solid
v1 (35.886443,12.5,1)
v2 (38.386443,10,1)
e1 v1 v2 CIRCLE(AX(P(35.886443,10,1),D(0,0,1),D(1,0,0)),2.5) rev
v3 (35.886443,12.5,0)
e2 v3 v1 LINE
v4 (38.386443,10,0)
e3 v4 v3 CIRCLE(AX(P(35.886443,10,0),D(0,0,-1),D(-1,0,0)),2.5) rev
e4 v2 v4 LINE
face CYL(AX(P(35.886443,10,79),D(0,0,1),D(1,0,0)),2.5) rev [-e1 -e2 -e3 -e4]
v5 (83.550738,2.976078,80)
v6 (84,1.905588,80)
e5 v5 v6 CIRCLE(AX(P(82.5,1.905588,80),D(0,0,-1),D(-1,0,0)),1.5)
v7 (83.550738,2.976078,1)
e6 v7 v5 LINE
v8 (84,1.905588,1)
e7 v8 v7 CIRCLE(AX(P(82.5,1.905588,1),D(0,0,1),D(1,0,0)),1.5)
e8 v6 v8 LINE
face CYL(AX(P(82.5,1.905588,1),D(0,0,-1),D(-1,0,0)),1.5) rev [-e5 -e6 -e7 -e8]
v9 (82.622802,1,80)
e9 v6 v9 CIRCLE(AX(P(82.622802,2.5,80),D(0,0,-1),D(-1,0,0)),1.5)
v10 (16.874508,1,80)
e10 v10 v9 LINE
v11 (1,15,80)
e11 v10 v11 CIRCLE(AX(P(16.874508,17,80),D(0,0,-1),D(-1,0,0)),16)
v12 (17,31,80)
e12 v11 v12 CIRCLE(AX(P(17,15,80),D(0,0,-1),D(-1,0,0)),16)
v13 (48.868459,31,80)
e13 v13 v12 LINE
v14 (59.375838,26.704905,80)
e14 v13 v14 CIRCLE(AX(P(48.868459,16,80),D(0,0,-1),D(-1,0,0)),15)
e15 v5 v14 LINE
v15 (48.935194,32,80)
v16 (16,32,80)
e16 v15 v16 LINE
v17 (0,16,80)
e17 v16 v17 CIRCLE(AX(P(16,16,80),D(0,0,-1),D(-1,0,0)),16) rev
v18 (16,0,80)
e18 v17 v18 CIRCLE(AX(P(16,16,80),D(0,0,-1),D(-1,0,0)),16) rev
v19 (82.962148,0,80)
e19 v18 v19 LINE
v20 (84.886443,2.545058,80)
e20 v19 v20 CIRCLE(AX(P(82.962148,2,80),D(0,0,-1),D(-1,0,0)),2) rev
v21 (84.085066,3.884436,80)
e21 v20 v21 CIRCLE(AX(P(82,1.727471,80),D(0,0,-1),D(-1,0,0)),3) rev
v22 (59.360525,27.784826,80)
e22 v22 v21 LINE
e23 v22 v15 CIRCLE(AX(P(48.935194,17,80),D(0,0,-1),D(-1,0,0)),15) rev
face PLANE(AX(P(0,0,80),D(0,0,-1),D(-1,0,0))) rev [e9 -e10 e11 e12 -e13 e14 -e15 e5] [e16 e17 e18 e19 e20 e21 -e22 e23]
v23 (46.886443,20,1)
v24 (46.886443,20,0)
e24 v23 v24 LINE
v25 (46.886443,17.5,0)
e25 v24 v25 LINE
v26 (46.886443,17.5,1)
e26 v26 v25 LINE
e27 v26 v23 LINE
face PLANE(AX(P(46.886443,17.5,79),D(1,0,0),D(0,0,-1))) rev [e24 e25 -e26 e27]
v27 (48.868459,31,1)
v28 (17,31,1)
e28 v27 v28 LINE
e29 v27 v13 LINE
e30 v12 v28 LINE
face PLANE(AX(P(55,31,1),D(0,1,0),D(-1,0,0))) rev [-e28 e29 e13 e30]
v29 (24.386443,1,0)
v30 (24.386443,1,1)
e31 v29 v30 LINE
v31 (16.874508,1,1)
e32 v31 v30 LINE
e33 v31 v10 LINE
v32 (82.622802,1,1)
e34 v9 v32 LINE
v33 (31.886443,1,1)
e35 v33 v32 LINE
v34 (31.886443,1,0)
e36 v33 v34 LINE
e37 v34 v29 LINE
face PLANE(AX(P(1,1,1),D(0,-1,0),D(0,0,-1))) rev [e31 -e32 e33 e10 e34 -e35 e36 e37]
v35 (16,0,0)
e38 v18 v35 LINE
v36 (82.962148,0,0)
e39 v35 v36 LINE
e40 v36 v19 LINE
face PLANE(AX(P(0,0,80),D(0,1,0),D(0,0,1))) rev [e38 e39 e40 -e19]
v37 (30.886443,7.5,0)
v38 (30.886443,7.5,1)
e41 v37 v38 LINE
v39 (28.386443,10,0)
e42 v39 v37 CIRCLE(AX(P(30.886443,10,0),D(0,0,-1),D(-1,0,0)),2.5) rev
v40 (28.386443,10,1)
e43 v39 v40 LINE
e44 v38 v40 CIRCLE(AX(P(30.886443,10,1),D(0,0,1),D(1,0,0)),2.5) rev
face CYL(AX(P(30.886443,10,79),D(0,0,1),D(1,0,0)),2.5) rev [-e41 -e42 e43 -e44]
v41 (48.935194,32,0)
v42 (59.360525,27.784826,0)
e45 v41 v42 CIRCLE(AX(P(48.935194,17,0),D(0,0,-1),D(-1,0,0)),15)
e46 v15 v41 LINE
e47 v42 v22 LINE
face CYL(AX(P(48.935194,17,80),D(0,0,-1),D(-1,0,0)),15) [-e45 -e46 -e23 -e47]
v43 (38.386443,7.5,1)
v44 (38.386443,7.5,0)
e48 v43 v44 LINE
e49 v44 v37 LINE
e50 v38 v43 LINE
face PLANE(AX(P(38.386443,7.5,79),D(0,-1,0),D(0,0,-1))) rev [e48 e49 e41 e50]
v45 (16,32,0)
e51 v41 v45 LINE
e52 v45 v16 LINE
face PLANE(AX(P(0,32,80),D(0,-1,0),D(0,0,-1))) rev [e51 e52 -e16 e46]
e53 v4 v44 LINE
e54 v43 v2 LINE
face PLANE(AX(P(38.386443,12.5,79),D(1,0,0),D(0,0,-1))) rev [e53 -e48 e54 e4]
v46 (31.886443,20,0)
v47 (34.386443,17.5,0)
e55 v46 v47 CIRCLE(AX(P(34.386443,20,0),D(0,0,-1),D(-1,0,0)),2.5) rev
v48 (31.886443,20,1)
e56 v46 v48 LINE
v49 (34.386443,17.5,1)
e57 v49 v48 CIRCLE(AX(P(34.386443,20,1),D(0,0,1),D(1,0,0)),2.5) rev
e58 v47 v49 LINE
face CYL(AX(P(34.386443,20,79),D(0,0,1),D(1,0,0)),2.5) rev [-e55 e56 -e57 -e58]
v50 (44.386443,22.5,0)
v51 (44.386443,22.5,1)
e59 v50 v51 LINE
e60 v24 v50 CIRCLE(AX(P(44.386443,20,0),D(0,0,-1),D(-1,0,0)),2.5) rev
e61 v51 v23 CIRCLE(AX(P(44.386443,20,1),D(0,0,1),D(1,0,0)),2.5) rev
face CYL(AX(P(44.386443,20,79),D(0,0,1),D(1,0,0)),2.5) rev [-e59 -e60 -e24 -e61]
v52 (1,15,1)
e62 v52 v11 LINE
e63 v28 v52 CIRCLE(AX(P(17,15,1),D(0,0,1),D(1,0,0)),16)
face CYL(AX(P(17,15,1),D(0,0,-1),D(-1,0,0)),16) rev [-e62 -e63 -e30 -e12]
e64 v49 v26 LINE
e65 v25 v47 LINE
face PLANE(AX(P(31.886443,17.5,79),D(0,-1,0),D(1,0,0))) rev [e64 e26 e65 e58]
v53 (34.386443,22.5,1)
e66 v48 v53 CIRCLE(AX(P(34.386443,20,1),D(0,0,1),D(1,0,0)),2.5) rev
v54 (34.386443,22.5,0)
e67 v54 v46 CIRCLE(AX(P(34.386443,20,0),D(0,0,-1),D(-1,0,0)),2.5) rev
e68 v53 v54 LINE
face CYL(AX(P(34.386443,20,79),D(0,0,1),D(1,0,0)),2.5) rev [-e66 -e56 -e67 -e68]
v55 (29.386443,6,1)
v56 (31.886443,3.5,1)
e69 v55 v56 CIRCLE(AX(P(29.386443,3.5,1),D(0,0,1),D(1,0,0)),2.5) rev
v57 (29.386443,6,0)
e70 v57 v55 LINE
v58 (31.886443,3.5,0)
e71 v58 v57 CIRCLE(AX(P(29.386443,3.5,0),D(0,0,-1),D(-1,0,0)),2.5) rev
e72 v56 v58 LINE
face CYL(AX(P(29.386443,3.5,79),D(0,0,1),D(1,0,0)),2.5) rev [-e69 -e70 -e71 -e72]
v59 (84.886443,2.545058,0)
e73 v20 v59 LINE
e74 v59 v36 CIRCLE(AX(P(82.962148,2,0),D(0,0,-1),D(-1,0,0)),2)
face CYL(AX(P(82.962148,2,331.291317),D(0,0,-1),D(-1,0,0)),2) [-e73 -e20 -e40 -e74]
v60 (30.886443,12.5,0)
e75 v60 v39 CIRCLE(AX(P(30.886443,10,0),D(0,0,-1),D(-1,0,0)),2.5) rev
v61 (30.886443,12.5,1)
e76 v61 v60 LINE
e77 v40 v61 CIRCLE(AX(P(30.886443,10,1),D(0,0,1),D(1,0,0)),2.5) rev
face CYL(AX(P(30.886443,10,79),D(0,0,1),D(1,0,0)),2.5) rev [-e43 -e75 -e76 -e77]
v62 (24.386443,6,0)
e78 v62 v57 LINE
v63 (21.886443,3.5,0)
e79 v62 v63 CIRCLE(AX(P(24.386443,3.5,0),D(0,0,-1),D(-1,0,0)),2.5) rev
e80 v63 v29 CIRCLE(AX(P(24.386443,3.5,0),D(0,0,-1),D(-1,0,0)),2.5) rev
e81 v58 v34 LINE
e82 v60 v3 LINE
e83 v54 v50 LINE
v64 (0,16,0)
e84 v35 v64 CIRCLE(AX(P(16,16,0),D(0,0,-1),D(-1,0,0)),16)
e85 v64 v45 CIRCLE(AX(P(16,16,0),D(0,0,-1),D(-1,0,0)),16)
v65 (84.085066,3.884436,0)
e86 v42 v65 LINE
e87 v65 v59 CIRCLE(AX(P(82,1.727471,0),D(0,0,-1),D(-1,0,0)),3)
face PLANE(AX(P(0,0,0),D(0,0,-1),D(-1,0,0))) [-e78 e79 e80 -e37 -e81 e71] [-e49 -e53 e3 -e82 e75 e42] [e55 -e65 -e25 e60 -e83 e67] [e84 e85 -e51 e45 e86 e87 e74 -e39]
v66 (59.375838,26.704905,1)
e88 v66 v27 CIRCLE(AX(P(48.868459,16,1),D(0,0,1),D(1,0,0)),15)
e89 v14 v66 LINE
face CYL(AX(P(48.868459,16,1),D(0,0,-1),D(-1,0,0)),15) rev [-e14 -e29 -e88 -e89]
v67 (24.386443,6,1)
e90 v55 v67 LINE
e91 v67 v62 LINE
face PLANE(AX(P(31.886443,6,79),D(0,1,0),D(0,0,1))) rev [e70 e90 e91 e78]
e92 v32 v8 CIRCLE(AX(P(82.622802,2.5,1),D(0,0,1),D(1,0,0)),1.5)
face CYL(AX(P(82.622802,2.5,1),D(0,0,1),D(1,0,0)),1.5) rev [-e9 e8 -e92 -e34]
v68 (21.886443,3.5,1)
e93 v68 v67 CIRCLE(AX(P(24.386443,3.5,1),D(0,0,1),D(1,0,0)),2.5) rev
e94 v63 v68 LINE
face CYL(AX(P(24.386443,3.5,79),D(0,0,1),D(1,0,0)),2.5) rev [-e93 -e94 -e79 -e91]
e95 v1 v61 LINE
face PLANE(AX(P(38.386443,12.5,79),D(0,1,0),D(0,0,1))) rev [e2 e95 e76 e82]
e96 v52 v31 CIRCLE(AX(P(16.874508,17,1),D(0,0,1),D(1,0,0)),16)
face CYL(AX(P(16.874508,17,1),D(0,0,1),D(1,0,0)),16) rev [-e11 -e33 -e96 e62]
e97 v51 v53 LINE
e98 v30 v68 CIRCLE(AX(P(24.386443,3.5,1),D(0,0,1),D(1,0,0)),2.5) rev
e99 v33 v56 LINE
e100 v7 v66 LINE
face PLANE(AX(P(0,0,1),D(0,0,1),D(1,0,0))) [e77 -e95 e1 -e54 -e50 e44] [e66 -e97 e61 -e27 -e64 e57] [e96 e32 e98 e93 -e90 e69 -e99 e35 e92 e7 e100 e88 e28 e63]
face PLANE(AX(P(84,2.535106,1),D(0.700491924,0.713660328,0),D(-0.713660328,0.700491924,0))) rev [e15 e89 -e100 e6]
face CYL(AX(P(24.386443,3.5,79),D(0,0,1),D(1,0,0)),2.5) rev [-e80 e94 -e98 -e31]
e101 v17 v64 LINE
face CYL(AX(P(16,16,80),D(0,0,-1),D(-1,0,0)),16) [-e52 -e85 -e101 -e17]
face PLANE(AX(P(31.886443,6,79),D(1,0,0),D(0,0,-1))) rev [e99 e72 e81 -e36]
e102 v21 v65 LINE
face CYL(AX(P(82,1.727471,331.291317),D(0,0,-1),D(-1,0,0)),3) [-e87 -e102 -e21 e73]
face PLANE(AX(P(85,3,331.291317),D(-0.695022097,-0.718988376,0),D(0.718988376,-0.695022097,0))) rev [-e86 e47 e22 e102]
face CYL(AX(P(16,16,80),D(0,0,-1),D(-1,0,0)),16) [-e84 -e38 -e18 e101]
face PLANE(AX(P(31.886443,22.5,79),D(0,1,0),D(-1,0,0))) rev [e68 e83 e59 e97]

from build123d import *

# Parameters (mm, degrees)
SKETCH1_W               = 85
SKETCH1_H               = 32
BOSS_EXTRUDE1_DEPTH     = 80
CUT_EXTRUDE7_DEPTH      = 122.033053337
CUT_EXTRUDE7_DEPTH_BACK = 80
CUT_EXTRUDE8_DEPTH      = 79
FILLET11_R              = 16
FILLET12_R              = 16
FILLET13_R              = 16
FILLET14_R              = 16
FILLET15_R              = 15
FILLET16_R              = 15
FILLET17_R              = 1.5
FILLET18_R              = 1.5
FILLET21_R              = 3
FILLET22_R              = 2
SKETCH18_W              = 15
SKETCH18_H              = 5
CUT_EXTRUDE14_DEPTH     = 79
SKETCH17_W              = 10
SKETCH17_H              = 5
CUT_EXTRUDE15_DEPTH     = 79
SKETCH16_W              = 10
SKETCH16_H              = 5
CUT_EXTRUDE16_DEPTH     = 79
FILLET29_R              = 2.5
FILLET30_R              = 2.5
FILLET31_R              = 2.5
FILLET32_R              = 2.5
FILLET33_R              = 2.5
FILLET34_R              = 2.5
FILLET35_R              = 2.5
FILLET36_R              = 2.5
FILLET37_R              = 2.5


# Some blends are built 0.0001 mm under size
with BuildPart() as part:
    # Sketch1 → Boss-Extrude1 (new body)
    with BuildSketch(Plane.XY):
        with Locations((42.5, 16)):
            Rectangle(SKETCH1_W, SKETCH1_H)
    extrude(amount=BOSS_EXTRUDE1_DEPTH)

    # Sketch3 → Cut-Extrude7 (cut, two sides: drawn at the far end of the back side and taken through both)
    with BuildSketch(Plane.XY.offset(80).offset(-CUT_EXTRUDE7_DEPTH_BACK)):
        Polygon((221.335887988, -128.791358388), (85, 3), (55, 32), (-81.335887988, 163.791358388), (182.246828788, 436.463134363), (484.918604763, 143.880417587), align=None)
    extrude(amount=CUT_EXTRUDE7_DEPTH + CUT_EXTRUDE7_DEPTH_BACK, mode=Mode.SUBTRACT)

    # Sketch6 → Cut-Extrude8 (cut)
    with BuildSketch(Plane.XY.offset(80)):
        Polygon((1, 31), (1, 1), (84, 1), (84, 2.535105728), (55, 31), align=None)
    extrude(amount=-CUT_EXTRUDE8_DEPTH, mode=Mode.SUBTRACT)

    # Fillet11
    fillet11_edges = [part.edges().sort_by_distance(p)[0] for p in [
        (1, 31, 40.5),
    ]]
    fillet(fillet11_edges, radius=FILLET11_R)

    # Fillet12
    # the kernel refuses this fillet: 16 mm, written as the material it adds along each edge
    with BuildSketch(Plane(origin=(1, 1, 80), x_dir=(0, 1, 0), z_dir=(0, 0, -1))) as fillet12_piece_1:
        with BuildLine():
            CenterArc((16, 15.874507866), FILLET12_R, 180, 82.819244219)
            Line((0, 15.874507866), (-0.32, 15.874507866))
            Line((-0.32, 15.874507866), (-0.32, 0))
            Line((-0.32, 0), (0, -0.32))
            ThreePointArc((0, -0.32), (7, -0.32), (13.96, -0.317490157))
            Line((13.96, -0.317490157), (14, 0))
        make_face()
    extrude(amount=79)

    # Fillet13
    fillet13_edges = [part.edges().sort_by_distance(p)[0] for p in [
        (0, 32, 40),
    ]]
    fillet(fillet13_edges, radius=FILLET13_R)

    # Fillet14
    fillet14_edges = [part.edges().sort_by_distance(p)[0] for p in [
        (0, 0, 40),
    ]]
    fillet(fillet14_edges, radius=FILLET14_R - 0.0001)  # a hair under: the kernel refuses the full size

    # Fillet15
    fillet15_edges = [part.edges().sort_by_distance(p)[0] for p in [
        (55, 31, 40.5),
    ]]
    fillet(fillet15_edges, radius=FILLET15_R)

    # Fillet16
    fillet16_edges = [part.edges().sort_by_distance(p)[0] for p in [
        (55, 32, 40),
    ]]
    fillet(fillet16_edges, radius=FILLET16_R)

    # Fillet17
    fillet17_edges = [part.edges().sort_by_distance(p)[0] for p in [
        (84, 2.535105728, 40.5),
    ]]
    fillet(fillet17_edges, radius=FILLET17_R)

    # Fillet18
    # the kernel refuses this fillet: 1.5 mm, written as the material it adds along each edge
    with BuildSketch(Plane(origin=(84, 1, 80), x_dir=(0, 1, 0), z_dir=(0, 0, -1))) as fillet18_piece_1:
        with BuildLine():
            CenterArc((1.5, -1.377197843), FILLET18_R, 113.345512124, 66.654487876)
            Line((0, -1.377197843), (-0.03, -1.377197843))
            Line((-0.03, -1.377197843), (-0.03, 0))
            Line((-0.03, 0), (0, 0.03))
            ThreePointArc((0, 0.03), (0.4527938, 0.03), (0.893699352, 0.027543957))
            Line((0.893699352, 0.027543957), (0.9055876, 0))
        make_face()
    extrude(amount=79)

    # Fillet21
    fillet21_edges = [part.edges().sort_by_distance(p)[0] for p in [
        (85, 3, 40),
    ]]
    fillet(fillet21_edges, radius=FILLET21_R)

    # Fillet22
    fillet22_edges = [part.edges().sort_by_distance(p)[0] for p in [
        (85, 0, 40),
    ]]
    fillet(fillet22_edges, radius=FILLET22_R)

    # Sketch18 → Cut-Extrude14 (cut)
    with BuildSketch(Plane(origin=(0, 0, 0), x_dir=(-1, 0, 0), z_dir=(0, 0, -1))):
        with Locations((-39.386442529, 20)):
            Rectangle(SKETCH18_W, SKETCH18_H)
    extrude(amount=-CUT_EXTRUDE14_DEPTH, mode=Mode.SUBTRACT)

    # Sketch17 → Cut-Extrude15 (cut)
    with BuildSketch(Plane(origin=(0, 0, 0), x_dir=(-1, 0, 0), z_dir=(0, 0, -1))):
        with Locations((-33.386442529, 10)):
            Rectangle(SKETCH17_W, SKETCH17_H)
    extrude(amount=-CUT_EXTRUDE15_DEPTH, mode=Mode.SUBTRACT)

    # Sketch16 → Cut-Extrude16 (cut)
    with BuildSketch(Plane(origin=(0, 0, 0), x_dir=(-1, 0, 0), z_dir=(0, 0, -1))):
        with Locations((-26.886442529, 3.5)):
            Rectangle(SKETCH16_W, SKETCH16_H)
    extrude(amount=-CUT_EXTRUDE16_DEPTH, mode=Mode.SUBTRACT)

    # Fillet29
    fillet29_edges = [part.edges().sort_by_distance(p)[0] for p in [
        (31.886442529, 22.5, 0.5),
    ]]
    fillet(fillet29_edges, radius=FILLET29_R)

    # Fillet30
    fillet30_edges = [part.edges().sort_by_distance(p)[0] for p in [
        (31.886442529, 17.5, 0.5),
    ]]
    fillet(fillet30_edges, radius=FILLET30_R - 0.0001)  # a hair under: the kernel refuses the full size

    # Fillet31
    fillet31_edges = [part.edges().sort_by_distance(p)[0] for p in [
        (46.886442529, 22.5, 0.5),
    ]]
    fillet(fillet31_edges, radius=FILLET31_R)

    # Fillet32
    fillet32_edges = [part.edges().sort_by_distance(p)[0] for p in [
        (28.386442529, 12.5, 0.5),
    ]]
    fillet(fillet32_edges, radius=FILLET32_R)

    # Fillet33
    fillet33_edges = [part.edges().sort_by_distance(p)[0] for p in [
        (28.386442529, 7.5, 0.5),
    ]]
    fillet(fillet33_edges, radius=FILLET33_R - 0.0001)  # a hair under: the kernel refuses the full size

    # Fillet34
    fillet34_edges = [part.edges().sort_by_distance(p)[0] for p in [
        (38.386442529, 12.5, 0.5),
    ]]
    fillet(fillet34_edges, radius=FILLET34_R)

    # Fillet35
    fillet35_edges = [part.edges().sort_by_distance(p)[0] for p in [
        (21.886442529, 6, 0.5),
    ]]
    fillet(fillet35_edges, radius=FILLET35_R)

    # Fillet36
    fillet36_edges = [part.edges().sort_by_distance(p)[0] for p in [
        (21.886442529, 1, 0.5),
    ]]
    fillet(fillet36_edges, radius=FILLET36_R - 0.0001)  # a hair under: the kernel refuses the full size

    # Fillet37
    fillet37_edges = [part.edges().sort_by_distance(p)[0] for p in [
        (31.886442529, 6, 0.5),
    ]]
    fillet(fillet37_edges, radius=FILLET37_R)


solid = part.part
